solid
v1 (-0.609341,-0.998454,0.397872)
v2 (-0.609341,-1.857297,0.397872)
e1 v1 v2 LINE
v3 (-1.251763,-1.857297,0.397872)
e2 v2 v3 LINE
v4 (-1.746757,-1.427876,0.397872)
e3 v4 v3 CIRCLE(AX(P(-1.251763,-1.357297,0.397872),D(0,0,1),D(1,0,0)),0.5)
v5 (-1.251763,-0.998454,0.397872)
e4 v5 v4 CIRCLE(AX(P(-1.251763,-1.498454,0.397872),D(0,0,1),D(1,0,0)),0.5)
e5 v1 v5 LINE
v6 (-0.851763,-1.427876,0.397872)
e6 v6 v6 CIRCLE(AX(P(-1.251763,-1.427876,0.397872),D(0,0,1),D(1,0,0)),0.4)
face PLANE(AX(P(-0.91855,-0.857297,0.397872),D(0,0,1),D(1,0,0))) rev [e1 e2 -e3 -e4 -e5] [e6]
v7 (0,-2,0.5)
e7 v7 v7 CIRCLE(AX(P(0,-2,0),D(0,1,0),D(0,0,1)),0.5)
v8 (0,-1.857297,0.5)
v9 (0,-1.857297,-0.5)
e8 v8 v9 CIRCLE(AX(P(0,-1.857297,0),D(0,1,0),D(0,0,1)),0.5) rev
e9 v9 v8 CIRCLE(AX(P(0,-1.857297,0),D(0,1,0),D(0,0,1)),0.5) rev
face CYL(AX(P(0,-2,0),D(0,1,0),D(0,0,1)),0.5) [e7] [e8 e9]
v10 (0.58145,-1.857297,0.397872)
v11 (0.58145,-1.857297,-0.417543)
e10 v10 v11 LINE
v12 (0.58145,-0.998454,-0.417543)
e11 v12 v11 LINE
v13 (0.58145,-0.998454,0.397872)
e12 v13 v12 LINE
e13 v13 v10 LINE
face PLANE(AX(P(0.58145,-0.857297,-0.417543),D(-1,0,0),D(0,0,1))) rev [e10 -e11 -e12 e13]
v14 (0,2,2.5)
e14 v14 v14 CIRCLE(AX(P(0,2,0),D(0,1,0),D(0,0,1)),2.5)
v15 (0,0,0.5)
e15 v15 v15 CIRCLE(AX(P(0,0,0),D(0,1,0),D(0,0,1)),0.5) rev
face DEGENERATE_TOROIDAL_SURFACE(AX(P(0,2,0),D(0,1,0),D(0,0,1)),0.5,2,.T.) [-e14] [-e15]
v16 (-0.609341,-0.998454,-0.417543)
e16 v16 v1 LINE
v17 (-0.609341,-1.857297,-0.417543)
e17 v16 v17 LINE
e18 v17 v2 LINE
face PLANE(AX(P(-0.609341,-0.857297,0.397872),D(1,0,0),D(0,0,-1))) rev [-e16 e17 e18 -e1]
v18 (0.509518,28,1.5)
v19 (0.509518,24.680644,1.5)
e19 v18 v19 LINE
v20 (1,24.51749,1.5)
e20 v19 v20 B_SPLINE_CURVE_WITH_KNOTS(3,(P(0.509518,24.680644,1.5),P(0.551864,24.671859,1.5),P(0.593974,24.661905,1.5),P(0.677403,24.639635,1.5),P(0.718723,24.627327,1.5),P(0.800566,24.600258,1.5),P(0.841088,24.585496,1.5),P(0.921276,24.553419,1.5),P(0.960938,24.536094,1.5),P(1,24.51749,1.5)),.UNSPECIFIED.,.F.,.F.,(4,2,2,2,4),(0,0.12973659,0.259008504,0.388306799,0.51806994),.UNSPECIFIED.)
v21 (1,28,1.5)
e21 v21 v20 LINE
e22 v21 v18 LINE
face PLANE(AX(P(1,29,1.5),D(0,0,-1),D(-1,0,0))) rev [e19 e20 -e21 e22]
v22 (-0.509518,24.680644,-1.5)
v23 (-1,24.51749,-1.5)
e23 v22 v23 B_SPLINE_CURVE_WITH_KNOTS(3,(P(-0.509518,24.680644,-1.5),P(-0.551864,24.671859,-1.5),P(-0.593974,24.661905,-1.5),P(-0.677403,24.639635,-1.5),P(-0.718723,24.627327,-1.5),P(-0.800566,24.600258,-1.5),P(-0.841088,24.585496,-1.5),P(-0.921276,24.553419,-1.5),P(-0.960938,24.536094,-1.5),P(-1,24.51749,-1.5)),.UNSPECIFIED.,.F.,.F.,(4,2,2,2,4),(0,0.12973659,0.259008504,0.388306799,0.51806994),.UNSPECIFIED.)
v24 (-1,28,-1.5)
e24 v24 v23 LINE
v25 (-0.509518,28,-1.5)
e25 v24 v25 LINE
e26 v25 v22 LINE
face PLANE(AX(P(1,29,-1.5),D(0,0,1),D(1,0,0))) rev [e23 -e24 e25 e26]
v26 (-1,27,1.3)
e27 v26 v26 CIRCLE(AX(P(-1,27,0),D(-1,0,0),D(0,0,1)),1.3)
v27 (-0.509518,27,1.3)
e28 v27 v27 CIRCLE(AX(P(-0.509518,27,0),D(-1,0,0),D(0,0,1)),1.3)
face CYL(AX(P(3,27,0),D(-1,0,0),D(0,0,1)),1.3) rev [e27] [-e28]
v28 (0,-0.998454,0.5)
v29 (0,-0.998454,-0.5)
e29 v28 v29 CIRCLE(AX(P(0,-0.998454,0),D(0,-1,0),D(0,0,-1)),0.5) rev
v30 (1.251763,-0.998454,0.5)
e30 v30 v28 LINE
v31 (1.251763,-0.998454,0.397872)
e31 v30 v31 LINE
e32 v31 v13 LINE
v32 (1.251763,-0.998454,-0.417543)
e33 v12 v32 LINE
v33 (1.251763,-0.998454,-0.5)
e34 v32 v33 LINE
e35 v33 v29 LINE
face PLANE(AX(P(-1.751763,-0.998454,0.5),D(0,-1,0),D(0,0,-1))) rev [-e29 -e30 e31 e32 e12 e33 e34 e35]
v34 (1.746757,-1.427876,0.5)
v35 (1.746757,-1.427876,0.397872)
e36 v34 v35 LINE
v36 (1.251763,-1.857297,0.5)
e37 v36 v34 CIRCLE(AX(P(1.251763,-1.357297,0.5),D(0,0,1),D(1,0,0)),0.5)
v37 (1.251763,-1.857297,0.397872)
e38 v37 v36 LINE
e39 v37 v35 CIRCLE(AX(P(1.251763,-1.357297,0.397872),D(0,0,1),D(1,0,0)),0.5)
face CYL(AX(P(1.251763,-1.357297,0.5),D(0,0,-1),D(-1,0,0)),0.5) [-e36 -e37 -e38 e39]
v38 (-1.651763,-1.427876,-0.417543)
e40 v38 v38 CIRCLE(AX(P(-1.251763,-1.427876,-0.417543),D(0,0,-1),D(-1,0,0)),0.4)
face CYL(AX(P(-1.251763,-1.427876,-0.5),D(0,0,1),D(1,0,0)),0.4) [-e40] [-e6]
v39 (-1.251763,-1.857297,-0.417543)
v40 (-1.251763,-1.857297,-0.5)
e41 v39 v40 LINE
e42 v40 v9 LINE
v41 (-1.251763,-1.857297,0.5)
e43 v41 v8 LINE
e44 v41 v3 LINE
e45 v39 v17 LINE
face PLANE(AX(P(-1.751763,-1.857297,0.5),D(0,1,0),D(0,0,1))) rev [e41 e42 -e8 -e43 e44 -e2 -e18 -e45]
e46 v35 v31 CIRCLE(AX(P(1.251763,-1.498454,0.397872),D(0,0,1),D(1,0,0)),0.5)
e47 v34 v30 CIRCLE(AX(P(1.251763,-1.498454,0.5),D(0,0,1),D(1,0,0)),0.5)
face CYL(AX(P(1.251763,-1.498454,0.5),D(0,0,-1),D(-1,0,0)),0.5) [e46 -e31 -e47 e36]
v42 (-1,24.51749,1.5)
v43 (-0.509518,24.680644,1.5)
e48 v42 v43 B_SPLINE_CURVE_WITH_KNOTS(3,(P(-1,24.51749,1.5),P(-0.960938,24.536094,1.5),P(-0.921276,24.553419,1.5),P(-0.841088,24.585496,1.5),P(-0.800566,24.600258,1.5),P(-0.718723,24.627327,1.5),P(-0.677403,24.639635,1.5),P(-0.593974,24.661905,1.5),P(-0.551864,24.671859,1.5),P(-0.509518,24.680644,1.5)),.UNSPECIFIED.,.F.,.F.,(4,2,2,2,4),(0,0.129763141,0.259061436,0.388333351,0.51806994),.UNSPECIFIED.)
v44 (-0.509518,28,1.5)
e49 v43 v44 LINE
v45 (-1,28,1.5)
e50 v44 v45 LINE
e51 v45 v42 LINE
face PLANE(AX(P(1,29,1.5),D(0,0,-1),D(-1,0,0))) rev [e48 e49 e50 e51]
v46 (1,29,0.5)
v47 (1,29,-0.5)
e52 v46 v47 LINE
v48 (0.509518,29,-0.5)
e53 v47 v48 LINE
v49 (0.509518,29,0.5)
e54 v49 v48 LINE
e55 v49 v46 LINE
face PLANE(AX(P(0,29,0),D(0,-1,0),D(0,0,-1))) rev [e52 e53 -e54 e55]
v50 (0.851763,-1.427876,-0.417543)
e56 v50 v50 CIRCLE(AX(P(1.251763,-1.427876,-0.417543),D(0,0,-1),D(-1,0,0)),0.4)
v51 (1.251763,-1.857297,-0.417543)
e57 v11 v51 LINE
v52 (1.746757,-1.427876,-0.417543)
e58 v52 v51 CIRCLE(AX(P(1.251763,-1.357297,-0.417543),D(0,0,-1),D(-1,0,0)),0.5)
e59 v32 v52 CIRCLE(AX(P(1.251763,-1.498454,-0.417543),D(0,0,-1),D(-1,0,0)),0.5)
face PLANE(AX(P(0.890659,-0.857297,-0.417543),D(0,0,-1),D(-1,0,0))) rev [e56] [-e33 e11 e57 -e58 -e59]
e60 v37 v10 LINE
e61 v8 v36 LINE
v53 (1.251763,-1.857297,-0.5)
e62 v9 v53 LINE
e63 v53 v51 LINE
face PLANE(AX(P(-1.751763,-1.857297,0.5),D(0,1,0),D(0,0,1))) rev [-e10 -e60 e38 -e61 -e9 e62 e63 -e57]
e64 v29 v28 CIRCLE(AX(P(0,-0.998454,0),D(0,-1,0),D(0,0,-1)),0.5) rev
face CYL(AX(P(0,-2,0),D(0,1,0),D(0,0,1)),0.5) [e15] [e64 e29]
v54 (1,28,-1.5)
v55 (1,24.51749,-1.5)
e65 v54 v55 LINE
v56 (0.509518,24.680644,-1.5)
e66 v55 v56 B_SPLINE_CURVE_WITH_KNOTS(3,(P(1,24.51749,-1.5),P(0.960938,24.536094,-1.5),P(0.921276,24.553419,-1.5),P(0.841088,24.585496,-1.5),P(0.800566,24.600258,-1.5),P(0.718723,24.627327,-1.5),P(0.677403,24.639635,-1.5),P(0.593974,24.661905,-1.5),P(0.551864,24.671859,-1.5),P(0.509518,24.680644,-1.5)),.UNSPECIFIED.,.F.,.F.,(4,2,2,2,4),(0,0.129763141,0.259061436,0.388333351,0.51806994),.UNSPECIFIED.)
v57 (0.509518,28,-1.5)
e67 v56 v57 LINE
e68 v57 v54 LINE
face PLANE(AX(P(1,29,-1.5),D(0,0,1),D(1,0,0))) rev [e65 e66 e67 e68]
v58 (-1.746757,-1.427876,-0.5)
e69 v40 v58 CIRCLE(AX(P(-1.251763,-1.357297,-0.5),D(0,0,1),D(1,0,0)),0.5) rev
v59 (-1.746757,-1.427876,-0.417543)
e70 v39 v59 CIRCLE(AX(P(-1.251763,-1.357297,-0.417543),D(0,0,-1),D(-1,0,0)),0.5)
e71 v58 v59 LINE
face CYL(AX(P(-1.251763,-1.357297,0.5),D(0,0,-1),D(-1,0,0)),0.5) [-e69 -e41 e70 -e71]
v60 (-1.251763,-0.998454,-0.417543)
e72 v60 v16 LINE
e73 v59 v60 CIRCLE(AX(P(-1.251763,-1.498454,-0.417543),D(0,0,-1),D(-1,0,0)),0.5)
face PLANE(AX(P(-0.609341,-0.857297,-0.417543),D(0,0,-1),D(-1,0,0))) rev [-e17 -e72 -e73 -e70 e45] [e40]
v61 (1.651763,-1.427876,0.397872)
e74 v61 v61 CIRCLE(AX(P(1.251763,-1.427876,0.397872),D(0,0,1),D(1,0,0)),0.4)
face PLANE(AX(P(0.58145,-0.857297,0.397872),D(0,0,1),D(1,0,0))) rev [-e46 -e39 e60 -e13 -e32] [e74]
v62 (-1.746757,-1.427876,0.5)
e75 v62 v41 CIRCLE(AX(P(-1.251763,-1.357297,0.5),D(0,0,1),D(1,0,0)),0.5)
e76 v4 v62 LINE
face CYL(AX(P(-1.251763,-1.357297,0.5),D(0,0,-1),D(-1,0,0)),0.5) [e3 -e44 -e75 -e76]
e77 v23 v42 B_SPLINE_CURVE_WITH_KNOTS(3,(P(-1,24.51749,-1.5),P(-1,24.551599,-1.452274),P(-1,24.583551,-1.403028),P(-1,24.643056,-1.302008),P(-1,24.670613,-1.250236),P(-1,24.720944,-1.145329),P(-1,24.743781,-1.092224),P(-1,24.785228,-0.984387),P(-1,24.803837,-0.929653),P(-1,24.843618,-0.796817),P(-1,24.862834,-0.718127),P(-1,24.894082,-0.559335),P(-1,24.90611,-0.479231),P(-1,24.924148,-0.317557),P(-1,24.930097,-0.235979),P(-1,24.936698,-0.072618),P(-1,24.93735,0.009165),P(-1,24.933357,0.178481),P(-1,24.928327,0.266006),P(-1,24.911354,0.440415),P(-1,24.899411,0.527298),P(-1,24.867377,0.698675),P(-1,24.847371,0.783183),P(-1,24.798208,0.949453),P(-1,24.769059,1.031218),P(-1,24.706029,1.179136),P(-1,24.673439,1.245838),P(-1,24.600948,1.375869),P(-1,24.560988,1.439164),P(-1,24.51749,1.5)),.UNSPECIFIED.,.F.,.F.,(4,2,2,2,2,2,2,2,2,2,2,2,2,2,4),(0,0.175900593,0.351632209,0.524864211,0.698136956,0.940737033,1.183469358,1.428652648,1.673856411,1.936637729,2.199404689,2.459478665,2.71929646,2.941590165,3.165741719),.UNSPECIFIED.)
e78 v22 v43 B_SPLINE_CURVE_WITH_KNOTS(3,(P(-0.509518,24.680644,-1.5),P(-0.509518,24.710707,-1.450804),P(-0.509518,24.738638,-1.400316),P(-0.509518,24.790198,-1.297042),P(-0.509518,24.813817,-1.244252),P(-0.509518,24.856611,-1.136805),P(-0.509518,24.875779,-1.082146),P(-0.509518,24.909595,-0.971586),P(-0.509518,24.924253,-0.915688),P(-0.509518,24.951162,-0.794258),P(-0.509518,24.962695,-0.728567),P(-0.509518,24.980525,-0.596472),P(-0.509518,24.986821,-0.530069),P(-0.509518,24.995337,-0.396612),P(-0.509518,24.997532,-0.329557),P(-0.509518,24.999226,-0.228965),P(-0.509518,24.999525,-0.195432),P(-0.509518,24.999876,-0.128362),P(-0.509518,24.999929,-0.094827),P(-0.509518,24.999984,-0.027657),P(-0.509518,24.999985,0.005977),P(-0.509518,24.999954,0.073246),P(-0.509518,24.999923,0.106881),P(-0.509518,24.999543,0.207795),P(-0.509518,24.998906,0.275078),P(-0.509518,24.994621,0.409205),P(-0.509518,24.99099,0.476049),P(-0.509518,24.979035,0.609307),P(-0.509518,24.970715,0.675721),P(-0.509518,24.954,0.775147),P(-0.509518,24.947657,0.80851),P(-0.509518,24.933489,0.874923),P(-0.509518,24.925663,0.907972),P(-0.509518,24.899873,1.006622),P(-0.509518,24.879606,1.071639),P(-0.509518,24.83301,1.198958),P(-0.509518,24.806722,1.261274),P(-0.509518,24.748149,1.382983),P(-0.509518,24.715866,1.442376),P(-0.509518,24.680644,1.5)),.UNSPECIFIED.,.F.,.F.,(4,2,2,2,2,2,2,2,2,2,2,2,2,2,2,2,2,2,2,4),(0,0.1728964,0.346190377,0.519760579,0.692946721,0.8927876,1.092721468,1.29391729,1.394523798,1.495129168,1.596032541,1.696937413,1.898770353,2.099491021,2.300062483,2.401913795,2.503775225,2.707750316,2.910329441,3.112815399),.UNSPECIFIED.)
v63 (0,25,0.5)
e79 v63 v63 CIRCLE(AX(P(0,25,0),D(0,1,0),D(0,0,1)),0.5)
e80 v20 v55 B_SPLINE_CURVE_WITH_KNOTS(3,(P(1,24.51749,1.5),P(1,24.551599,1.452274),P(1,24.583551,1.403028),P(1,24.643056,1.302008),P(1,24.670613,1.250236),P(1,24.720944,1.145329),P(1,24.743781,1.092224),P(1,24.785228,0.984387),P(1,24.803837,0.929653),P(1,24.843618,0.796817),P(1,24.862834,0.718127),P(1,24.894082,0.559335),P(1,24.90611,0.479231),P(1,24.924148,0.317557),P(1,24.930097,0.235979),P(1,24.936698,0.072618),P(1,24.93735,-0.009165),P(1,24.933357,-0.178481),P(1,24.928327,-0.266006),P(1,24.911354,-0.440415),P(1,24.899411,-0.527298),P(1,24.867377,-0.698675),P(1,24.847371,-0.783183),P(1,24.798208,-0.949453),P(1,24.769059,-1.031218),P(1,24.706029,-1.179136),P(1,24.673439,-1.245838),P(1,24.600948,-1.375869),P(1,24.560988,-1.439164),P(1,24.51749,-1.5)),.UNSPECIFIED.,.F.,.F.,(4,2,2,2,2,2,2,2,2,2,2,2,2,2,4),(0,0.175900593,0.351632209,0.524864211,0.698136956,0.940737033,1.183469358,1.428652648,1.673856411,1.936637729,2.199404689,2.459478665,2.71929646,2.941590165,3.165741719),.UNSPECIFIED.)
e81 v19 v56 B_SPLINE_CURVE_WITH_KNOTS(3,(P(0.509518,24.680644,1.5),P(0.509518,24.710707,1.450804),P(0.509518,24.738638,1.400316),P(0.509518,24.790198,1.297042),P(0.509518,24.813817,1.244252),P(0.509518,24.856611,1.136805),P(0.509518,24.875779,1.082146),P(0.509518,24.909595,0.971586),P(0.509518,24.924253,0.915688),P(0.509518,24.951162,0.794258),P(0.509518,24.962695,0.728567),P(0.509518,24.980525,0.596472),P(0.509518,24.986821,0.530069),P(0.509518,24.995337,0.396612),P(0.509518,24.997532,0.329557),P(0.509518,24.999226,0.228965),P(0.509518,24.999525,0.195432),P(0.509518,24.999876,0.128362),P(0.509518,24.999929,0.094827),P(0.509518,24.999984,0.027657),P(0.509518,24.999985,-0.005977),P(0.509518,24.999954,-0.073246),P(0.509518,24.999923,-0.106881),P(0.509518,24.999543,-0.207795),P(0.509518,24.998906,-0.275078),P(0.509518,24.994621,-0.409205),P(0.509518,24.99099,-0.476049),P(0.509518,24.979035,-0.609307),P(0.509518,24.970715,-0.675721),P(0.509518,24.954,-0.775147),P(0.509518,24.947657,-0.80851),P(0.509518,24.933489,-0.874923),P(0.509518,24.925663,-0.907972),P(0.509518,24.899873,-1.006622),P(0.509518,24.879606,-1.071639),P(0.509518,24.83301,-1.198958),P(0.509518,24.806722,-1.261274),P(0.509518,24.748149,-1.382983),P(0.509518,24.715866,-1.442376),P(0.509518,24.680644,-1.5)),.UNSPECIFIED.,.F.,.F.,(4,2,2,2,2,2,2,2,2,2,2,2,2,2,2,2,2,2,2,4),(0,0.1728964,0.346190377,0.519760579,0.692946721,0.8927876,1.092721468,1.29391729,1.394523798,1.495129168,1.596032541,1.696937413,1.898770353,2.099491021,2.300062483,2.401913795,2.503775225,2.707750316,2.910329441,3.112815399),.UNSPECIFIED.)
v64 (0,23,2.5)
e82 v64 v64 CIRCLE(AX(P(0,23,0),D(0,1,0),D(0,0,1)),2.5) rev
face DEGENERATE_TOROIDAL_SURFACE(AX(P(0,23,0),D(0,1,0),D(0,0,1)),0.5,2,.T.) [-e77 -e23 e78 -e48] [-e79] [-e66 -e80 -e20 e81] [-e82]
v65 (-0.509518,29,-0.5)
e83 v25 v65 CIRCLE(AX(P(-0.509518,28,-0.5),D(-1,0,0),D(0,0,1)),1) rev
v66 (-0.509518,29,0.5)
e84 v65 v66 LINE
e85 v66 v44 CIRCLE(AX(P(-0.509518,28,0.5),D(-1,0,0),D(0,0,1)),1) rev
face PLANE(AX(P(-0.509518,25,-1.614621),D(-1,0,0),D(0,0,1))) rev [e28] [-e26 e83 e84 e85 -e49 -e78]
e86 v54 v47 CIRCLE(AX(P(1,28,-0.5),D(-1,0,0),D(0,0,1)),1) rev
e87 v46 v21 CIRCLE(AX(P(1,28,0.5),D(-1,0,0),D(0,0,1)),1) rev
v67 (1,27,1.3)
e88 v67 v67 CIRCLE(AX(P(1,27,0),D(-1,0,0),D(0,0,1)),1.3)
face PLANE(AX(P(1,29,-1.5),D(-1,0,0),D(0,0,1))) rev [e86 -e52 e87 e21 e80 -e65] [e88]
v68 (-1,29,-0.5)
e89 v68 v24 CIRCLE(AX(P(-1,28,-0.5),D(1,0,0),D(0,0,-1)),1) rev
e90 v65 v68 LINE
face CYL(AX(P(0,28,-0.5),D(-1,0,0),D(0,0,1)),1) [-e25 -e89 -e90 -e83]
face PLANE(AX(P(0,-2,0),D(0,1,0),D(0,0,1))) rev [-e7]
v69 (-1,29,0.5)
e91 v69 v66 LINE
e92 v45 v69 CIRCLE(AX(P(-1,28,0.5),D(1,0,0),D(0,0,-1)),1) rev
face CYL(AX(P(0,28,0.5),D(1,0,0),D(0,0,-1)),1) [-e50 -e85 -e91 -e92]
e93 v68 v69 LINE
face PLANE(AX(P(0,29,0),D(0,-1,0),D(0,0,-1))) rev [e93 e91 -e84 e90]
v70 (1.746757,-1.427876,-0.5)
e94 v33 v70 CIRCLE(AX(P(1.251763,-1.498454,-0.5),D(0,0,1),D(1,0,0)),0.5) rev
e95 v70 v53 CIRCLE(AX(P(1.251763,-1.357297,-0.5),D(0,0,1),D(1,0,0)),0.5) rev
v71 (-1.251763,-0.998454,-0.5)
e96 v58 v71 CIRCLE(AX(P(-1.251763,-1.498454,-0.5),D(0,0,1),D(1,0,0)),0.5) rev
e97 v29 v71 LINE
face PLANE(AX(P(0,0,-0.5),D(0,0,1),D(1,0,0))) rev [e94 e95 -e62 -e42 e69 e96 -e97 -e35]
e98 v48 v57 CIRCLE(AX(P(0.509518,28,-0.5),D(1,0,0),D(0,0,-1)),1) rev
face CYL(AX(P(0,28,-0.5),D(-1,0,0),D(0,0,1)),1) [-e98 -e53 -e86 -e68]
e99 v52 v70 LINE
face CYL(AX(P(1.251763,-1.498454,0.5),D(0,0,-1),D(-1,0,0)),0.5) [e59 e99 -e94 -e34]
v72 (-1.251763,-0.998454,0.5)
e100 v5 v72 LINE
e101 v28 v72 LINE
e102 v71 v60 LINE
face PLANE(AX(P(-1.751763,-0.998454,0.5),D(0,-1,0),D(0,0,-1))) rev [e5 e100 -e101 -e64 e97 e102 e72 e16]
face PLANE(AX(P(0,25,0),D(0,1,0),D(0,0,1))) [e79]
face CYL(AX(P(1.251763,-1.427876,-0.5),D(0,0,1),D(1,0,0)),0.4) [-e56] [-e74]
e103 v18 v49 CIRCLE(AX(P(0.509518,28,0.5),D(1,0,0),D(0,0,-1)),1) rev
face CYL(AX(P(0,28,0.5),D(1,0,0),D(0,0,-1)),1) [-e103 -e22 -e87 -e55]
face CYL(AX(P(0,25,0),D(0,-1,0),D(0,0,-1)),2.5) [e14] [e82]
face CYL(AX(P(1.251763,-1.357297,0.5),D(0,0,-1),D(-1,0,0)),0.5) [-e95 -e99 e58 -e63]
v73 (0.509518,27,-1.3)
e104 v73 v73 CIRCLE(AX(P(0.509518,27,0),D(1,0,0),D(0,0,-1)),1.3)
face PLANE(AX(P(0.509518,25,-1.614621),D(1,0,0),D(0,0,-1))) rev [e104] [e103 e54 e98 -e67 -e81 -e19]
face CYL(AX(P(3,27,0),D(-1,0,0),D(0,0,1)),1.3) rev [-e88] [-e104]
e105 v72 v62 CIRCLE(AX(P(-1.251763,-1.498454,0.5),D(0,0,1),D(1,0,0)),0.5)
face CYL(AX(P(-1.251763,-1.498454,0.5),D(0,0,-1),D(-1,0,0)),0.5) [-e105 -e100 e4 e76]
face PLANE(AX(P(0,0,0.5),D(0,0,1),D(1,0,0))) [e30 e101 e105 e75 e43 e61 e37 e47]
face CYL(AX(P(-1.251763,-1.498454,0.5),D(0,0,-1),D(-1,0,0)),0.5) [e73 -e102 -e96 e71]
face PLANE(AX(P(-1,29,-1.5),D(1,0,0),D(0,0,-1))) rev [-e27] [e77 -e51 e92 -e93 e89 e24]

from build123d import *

# Parameters (mm, degrees)
SKETCH1_R           = 2.5
BOSS_EXTRUDE1_DEPTH = 25
SKETCH2_W           = 2
SKETCH2_H           = 3
SKETCH2_W_2         = 1
SKETCH2_H_2         = 2
BOSS_EXTRUDE2_DEPTH = 4
SKETCH3_W           = 1.019035956
SKETCH3_H           = 3.229242318
CUT_EXTRUDE1_DEPTH  = 4
SKETCH4_R           = 1.3
CUT_EXTRUDE2_DEPTH  = 4
FILLET1_R           = 1
FILLET2_R           = 2
SKETCH5_R           = 0.5
BOSS_EXTRUDE3_DEPTH = 2
SKETCH6_W           = 3.503526818
SKETCH6_H           = 0.85884316
BOSS_EXTRUDE4_DEPTH = 0.5
FILLET3_R           = 0.5
SKETCH7_W           = 0.309208581
SKETCH7_H           = 0.81541506
CUT_EXTRUDE6_DEPTH  = 1
LPATTERN1_COUNT     = 2
LPATTERN1_PITCH     = 1.5
FILLET4_R           = 0.5
CUT_EXTRUDE8_DEPTH  = 1
CUT_EXTRUDE9_DEPTH  = 1
SKETCH12_R          = 0.4
BOSS_EXTRUDE5_DEPTH = 1
SKETCH13_R          = 0.4
BOSS_EXTRUDE6_DEPTH = 1


with BuildPart() as part:
    # Sketch1 → Boss-Extrude1 (new body)
    with BuildSketch(Plane(origin=(0, 0, 0), x_dir=(1, 0, 0), z_dir=(0, 1, 0))):
        with Locations(Location((0, 0, 0), (0, 0, 270))):
            Circle(SKETCH1_R)
    extrude(amount=BOSS_EXTRUDE1_DEPTH)

    # Sketch2 → Boss-Extrude2 (add)
    with BuildSketch(Plane(origin=(0, 25, 0), x_dir=(1, 0, 0), z_dir=(0, 1, 0))):
        Rectangle(SKETCH2_W, SKETCH2_H)
        Rectangle(SKETCH2_W_2, SKETCH2_H_2, mode=Mode.SUBTRACT)
    extrude(amount=BOSS_EXTRUDE2_DEPTH)

    # Sketch3 → Cut-Extrude1 (cut)
    with BuildSketch(Plane(origin=(0, 29, 0), x_dir=(1, 0, 0), z_dir=(0, 1, 0))):
        Rectangle(SKETCH3_W, SKETCH3_H)
    extrude(amount=-CUT_EXTRUDE1_DEPTH, mode=Mode.SUBTRACT)

    # Sketch4 → Cut-Extrude2 (cut)
    with BuildSketch(Plane.ZY.offset(1)):
        with Locations((0, 27)):
            Circle(SKETCH4_R)
    extrude(amount=-CUT_EXTRUDE2_DEPTH, mode=Mode.SUBTRACT)

    # Fillet1
    fillet1_edges = [part.edges().sort_by_distance(p)[0] for p in [
        (-0.754758989, 29, 1.5),
        (0.754758989, 29, -1.5),
        (-0.754758989, 29, -1.5),
        (0.754758989, 29, 1.5),
    ]]
    fillet(fillet1_edges, radius=FILLET1_R)

    # Fillet2
    # the kernel refuses this fillet: 2 mm, written as the material it takes off along each edge
    with BuildSketch(Plane(origin=(0, 0, 0), x_dir=(0, 0, 1), z_dir=(-1, 0, 0))) as fillet2_piece_1:
        with BuildLine():
            CenterArc((2.5 - FILLET2_R, FILLET2_R), FILLET2_R, 270, 90)
            Line((2.5 - FILLET2_R, 0), (2.5, 0))
            Line((2.5, 0), (2.5, FILLET2_R))
        make_face()
    revolve(axis=Axis((0, 0, 0), (0, 1, 0)), mode=Mode.SUBTRACT)
    with BuildSketch(Plane(origin=(0, 25, 0), x_dir=(0, 0, 1), z_dir=(-1, 0, 0))) as fillet2_piece_2_section:
        with BuildLine():
            CenterArc((2.5 - FILLET2_R, -FILLET2_R), FILLET2_R, 0, 90)
            Line((2.5, -FILLET2_R), (2.5, 0))
            Line((2.5, 0), (2.5 - FILLET2_R, 0))
        make_face()
    fillet2_piece_2 = revolve(axis=Axis((0, 25, 0), (0, 1, 0)), mode=Mode.PRIVATE)
    fillet2_piece_2 = split(fillet2_piece_2, bisect_by=Plane(origin=(0.509517978, 24.924108372, -1.066767337), z_dir=(-1, 0, 0)), keep=Keep.TOP, mode=Mode.PRIVATE)
    fillet2_piece_2 = split(fillet2_piece_2, bisect_by=Plane(origin=(-0.509517978, 24.924108372, -1.066767337), z_dir=(1, 0, 0)), keep=Keep.TOP, mode=Mode.PRIVATE)
    add(fillet2_piece_2, mode=Mode.SUBTRACT)
    with BuildSketch(Plane(origin=(0, 25, 0), x_dir=(0, 0, 1), z_dir=(-1, 0, 0))) as fillet2_piece_3_section:
        with BuildLine():
            CenterArc((2.5 - FILLET2_R, -FILLET2_R), FILLET2_R, 0, 90)
            Line((2.5, -FILLET2_R), (2.5, 0))
            Line((2.5, 0), (2.5 - FILLET2_R, 0))
        make_face()
    fillet2_piece_3 = revolve(axis=Axis((0, 25, 0), (0, 1, 0)), mode=Mode.PRIVATE)
    fillet2_piece_3 = split(fillet2_piece_3, bisect_by=Plane(origin=(0.753348396, 24.487146264, 1.5), z_dir=(0, 0, 1)), keep=Keep.TOP, mode=Mode.PRIVATE)
    add(fillet2_piece_3, mode=Mode.SUBTRACT)
    with BuildSketch(Plane(origin=(0, 25, 0), x_dir=(0, 0, 1), z_dir=(-1, 0, 0))) as fillet2_piece_4_section:
        with BuildLine():
            CenterArc((2.5 - FILLET2_R, -FILLET2_R), FILLET2_R, 0, 90)
            Line((2.5, -FILLET2_R), (2.5, 0))
            Line((2.5, 0), (2.5 - FILLET2_R, 0))
        make_face()
    fillet2_piece_4 = revolve(axis=Axis((0, 25, 0), (0, 1, 0)), mode=Mode.PRIVATE)
    fillet2_piece_4 = split(fillet2_piece_4, bisect_by=Plane(origin=(1, 24.532221184, 1.15e-07), z_dir=(1, 0, 0)), keep=Keep.TOP, mode=Mode.PRIVATE)
    add(fillet2_piece_4, mode=Mode.SUBTRACT)
    with BuildSketch(Plane(origin=(0, 25, 0), x_dir=(0, 0, 1), z_dir=(-1, 0, 0))) as fillet2_piece_5_section:
        with BuildLine():
            CenterArc((2.5 - FILLET2_R, -FILLET2_R), FILLET2_R, 0, 90)
            Line((2.5, -FILLET2_R), (2.5, 0))
            Line((2.5, 0), (2.5 - FILLET2_R, 0))
        make_face()
    fillet2_piece_5 = revolve(axis=Axis((0, 25, 0), (0, 1, 0)), mode=Mode.PRIVATE)
    fillet2_piece_5 = split(fillet2_piece_5, bisect_by=Plane(origin=(0.753348395, 24.487146008, -1.5), z_dir=(0, 0, -1)), keep=Keep.TOP, mode=Mode.PRIVATE)
    add(fillet2_piece_5, mode=Mode.SUBTRACT)
    with BuildSketch(Plane(origin=(0, 25, 0), x_dir=(0, 0, 1), z_dir=(-1, 0, 0))) as fillet2_piece_6_section:
        with BuildLine():
            CenterArc((2.5 - FILLET2_R, -FILLET2_R), FILLET2_R, 0, 90)
            Line((2.5, -FILLET2_R), (2.5, 0))
            Line((2.5, 0), (2.5 - FILLET2_R, 0))
        make_face()
    fillet2_piece_6 = revolve(axis=Axis((0, 25, 0), (0, 1, 0)), mode=Mode.PRIVATE)
    fillet2_piece_6 = split(fillet2_piece_6, bisect_by=Plane(origin=(-1, 24.532221184, -1.16e-07), z_dir=(-1, 0, 0)), keep=Keep.TOP, mode=Mode.PRIVATE)
    add(fillet2_piece_6, mode=Mode.SUBTRACT)

    # Sketch5 → Boss-Extrude3 (add)
    with BuildSketch(Plane(origin=(0, 0, 0), x_dir=(1, 0, 0), z_dir=(0, 1, 0))):
        with Locations(Location((0, 0, 0), (0, 0, 270))):
            Circle(SKETCH5_R)
    extrude(amount=-BOSS_EXTRUDE3_DEPTH)

    # Sketch6 → Boss-Extrude4 (add, symmetric)
    with BuildSketch(Plane.XY):
        with Locations((0, -1.427875915)):
            Rectangle(SKETCH6_W, SKETCH6_H)
    extrude(amount=BOSS_EXTRUDE4_DEPTH, both=True)

    # Fillet3
    # the kernel refuses this fillet: 0.5 mm, written as the material it takes off along each edge
    with BuildSketch(Plane(origin=(1.751763409, -0.998454335, 1.75), x_dir=(-1, 0, 0), z_dir=(0, 0, -1)), Plane(origin=(1.751763409, -1.857297495, 1.75), x_dir=(0, 1, 0), z_dir=(0, 0, -1)), Plane(origin=(-1.751763409, -0.998454335, -1.75), x_dir=(1, 0, 0), z_dir=(0, 0, 1)), Plane(origin=(-1.751763409, -1.857297495, -1.75), x_dir=(0, 1, 0), z_dir=(0, 0, 1))) as fillet3_piece_1:
        with BuildLine():
            CenterArc((FILLET3_R, -FILLET3_R), FILLET3_R, 90, 90)
            Line((0, -FILLET3_R), (0, 0))
            Line((0, 0), (FILLET3_R, 0))
        make_face()
    extrude(amount=3.5, mode=Mode.SUBTRACT)

    # Sketch7 → Cut-Extrude6 (cut)
    with BuildSketch(Plane.XZ.offset(1.857297495)):
        with Locations((-0.76394551, -0.009835432)):
            Rectangle(SKETCH7_W, SKETCH7_H)
    cut_extrude6 = extrude(amount=-CUT_EXTRUDE6_DEPTH, mode=Mode.SUBTRACT)

    # LPattern1: Cut-Extrude6 ×2
    with Locations(*[(i * LPATTERN1_PITCH, 0, 0) for i in range(1, LPATTERN1_COUNT)]):
        add(cut_extrude6, mode=Mode.SUBTRACT)

    # Fillet4
    # the kernel refuses this fillet: 0.5 mm, written as the material it adds along each edge
    # the kernel refuses this fillet: 0.5 mm, written as the material it takes off along each edge
    with BuildSketch(Plane(origin=(-0.9185498, -0.998454335, -0.417542962), x_dir=(-1, 0, 0), z_dir=(0, 0, 1)), Plane(origin=(-0.9185498, -1.857297495, -0.417542962), x_dir=(0, 1, 0), z_dir=(0, 0, 1)), Plane(origin=(0.890658781, -0.998454335, 0.397872098), x_dir=(1, 0, 0), z_dir=(0, 0, -1)), Plane(origin=(0.890658781, -1.857297495, 0.397872098), x_dir=(0, 1, 0), z_dir=(0, 0, -1))) as fillet4_2_piece_1:
        with BuildLine():
            CenterArc((FILLET4_R, FILLET4_R), FILLET4_R, 180, 90)
            Line((0, FILLET4_R), (0, 0))
            Line((0, 0), (FILLET4_R, 0))
        make_face()
    extrude(amount=0.81541506, mode=Mode.SUBTRACT)

    # Sketch10 → Cut-Extrude8 (cut)
    with BuildSketch(Plane.XZ.offset(1.857297495)):
        Polygon((-0.923556177, 0.397872098), (-1.784787166, 0.397872098), (-1.784787166, -0.417542962), (-0.876989159, -0.417542962), (-0.876989159, 0.397872098), align=None)
    extrude(amount=-CUT_EXTRUDE8_DEPTH, mode=Mode.SUBTRACT)

    # Sketch11 → Cut-Extrude9 (cut)
    with BuildSketch(Plane(origin=(0, -1.857297495, 0), x_dir=(-1, 0, 0), z_dir=(0, -1, 0))):
        Polygon((-0.741652452, -0.397872098), (-1.858092241, -0.397872098), (-1.858092241, 0.417542962), (-0.783282411, 0.417542962), align=None)
    extrude(amount=-CUT_EXTRUDE9_DEPTH, mode=Mode.SUBTRACT)

    # Sketch12 → Boss-Extrude5 (add)
    with BuildSketch(Plane.XY.offset(0.5)):
        with Locations((-1.251763409, -1.427875915)):
            Circle(SKETCH12_R)
    extrude(amount=-BOSS_EXTRUDE5_DEPTH)

    # Sketch13 → Boss-Extrude6 (add)
    with BuildSketch(Plane.XY.offset(0.5)):
        with Locations((1.251763409, -1.427875915)):
            Circle(SKETCH13_R)
    extrude(amount=-BOSS_EXTRUDE6_DEPTH)


solid = part.part
